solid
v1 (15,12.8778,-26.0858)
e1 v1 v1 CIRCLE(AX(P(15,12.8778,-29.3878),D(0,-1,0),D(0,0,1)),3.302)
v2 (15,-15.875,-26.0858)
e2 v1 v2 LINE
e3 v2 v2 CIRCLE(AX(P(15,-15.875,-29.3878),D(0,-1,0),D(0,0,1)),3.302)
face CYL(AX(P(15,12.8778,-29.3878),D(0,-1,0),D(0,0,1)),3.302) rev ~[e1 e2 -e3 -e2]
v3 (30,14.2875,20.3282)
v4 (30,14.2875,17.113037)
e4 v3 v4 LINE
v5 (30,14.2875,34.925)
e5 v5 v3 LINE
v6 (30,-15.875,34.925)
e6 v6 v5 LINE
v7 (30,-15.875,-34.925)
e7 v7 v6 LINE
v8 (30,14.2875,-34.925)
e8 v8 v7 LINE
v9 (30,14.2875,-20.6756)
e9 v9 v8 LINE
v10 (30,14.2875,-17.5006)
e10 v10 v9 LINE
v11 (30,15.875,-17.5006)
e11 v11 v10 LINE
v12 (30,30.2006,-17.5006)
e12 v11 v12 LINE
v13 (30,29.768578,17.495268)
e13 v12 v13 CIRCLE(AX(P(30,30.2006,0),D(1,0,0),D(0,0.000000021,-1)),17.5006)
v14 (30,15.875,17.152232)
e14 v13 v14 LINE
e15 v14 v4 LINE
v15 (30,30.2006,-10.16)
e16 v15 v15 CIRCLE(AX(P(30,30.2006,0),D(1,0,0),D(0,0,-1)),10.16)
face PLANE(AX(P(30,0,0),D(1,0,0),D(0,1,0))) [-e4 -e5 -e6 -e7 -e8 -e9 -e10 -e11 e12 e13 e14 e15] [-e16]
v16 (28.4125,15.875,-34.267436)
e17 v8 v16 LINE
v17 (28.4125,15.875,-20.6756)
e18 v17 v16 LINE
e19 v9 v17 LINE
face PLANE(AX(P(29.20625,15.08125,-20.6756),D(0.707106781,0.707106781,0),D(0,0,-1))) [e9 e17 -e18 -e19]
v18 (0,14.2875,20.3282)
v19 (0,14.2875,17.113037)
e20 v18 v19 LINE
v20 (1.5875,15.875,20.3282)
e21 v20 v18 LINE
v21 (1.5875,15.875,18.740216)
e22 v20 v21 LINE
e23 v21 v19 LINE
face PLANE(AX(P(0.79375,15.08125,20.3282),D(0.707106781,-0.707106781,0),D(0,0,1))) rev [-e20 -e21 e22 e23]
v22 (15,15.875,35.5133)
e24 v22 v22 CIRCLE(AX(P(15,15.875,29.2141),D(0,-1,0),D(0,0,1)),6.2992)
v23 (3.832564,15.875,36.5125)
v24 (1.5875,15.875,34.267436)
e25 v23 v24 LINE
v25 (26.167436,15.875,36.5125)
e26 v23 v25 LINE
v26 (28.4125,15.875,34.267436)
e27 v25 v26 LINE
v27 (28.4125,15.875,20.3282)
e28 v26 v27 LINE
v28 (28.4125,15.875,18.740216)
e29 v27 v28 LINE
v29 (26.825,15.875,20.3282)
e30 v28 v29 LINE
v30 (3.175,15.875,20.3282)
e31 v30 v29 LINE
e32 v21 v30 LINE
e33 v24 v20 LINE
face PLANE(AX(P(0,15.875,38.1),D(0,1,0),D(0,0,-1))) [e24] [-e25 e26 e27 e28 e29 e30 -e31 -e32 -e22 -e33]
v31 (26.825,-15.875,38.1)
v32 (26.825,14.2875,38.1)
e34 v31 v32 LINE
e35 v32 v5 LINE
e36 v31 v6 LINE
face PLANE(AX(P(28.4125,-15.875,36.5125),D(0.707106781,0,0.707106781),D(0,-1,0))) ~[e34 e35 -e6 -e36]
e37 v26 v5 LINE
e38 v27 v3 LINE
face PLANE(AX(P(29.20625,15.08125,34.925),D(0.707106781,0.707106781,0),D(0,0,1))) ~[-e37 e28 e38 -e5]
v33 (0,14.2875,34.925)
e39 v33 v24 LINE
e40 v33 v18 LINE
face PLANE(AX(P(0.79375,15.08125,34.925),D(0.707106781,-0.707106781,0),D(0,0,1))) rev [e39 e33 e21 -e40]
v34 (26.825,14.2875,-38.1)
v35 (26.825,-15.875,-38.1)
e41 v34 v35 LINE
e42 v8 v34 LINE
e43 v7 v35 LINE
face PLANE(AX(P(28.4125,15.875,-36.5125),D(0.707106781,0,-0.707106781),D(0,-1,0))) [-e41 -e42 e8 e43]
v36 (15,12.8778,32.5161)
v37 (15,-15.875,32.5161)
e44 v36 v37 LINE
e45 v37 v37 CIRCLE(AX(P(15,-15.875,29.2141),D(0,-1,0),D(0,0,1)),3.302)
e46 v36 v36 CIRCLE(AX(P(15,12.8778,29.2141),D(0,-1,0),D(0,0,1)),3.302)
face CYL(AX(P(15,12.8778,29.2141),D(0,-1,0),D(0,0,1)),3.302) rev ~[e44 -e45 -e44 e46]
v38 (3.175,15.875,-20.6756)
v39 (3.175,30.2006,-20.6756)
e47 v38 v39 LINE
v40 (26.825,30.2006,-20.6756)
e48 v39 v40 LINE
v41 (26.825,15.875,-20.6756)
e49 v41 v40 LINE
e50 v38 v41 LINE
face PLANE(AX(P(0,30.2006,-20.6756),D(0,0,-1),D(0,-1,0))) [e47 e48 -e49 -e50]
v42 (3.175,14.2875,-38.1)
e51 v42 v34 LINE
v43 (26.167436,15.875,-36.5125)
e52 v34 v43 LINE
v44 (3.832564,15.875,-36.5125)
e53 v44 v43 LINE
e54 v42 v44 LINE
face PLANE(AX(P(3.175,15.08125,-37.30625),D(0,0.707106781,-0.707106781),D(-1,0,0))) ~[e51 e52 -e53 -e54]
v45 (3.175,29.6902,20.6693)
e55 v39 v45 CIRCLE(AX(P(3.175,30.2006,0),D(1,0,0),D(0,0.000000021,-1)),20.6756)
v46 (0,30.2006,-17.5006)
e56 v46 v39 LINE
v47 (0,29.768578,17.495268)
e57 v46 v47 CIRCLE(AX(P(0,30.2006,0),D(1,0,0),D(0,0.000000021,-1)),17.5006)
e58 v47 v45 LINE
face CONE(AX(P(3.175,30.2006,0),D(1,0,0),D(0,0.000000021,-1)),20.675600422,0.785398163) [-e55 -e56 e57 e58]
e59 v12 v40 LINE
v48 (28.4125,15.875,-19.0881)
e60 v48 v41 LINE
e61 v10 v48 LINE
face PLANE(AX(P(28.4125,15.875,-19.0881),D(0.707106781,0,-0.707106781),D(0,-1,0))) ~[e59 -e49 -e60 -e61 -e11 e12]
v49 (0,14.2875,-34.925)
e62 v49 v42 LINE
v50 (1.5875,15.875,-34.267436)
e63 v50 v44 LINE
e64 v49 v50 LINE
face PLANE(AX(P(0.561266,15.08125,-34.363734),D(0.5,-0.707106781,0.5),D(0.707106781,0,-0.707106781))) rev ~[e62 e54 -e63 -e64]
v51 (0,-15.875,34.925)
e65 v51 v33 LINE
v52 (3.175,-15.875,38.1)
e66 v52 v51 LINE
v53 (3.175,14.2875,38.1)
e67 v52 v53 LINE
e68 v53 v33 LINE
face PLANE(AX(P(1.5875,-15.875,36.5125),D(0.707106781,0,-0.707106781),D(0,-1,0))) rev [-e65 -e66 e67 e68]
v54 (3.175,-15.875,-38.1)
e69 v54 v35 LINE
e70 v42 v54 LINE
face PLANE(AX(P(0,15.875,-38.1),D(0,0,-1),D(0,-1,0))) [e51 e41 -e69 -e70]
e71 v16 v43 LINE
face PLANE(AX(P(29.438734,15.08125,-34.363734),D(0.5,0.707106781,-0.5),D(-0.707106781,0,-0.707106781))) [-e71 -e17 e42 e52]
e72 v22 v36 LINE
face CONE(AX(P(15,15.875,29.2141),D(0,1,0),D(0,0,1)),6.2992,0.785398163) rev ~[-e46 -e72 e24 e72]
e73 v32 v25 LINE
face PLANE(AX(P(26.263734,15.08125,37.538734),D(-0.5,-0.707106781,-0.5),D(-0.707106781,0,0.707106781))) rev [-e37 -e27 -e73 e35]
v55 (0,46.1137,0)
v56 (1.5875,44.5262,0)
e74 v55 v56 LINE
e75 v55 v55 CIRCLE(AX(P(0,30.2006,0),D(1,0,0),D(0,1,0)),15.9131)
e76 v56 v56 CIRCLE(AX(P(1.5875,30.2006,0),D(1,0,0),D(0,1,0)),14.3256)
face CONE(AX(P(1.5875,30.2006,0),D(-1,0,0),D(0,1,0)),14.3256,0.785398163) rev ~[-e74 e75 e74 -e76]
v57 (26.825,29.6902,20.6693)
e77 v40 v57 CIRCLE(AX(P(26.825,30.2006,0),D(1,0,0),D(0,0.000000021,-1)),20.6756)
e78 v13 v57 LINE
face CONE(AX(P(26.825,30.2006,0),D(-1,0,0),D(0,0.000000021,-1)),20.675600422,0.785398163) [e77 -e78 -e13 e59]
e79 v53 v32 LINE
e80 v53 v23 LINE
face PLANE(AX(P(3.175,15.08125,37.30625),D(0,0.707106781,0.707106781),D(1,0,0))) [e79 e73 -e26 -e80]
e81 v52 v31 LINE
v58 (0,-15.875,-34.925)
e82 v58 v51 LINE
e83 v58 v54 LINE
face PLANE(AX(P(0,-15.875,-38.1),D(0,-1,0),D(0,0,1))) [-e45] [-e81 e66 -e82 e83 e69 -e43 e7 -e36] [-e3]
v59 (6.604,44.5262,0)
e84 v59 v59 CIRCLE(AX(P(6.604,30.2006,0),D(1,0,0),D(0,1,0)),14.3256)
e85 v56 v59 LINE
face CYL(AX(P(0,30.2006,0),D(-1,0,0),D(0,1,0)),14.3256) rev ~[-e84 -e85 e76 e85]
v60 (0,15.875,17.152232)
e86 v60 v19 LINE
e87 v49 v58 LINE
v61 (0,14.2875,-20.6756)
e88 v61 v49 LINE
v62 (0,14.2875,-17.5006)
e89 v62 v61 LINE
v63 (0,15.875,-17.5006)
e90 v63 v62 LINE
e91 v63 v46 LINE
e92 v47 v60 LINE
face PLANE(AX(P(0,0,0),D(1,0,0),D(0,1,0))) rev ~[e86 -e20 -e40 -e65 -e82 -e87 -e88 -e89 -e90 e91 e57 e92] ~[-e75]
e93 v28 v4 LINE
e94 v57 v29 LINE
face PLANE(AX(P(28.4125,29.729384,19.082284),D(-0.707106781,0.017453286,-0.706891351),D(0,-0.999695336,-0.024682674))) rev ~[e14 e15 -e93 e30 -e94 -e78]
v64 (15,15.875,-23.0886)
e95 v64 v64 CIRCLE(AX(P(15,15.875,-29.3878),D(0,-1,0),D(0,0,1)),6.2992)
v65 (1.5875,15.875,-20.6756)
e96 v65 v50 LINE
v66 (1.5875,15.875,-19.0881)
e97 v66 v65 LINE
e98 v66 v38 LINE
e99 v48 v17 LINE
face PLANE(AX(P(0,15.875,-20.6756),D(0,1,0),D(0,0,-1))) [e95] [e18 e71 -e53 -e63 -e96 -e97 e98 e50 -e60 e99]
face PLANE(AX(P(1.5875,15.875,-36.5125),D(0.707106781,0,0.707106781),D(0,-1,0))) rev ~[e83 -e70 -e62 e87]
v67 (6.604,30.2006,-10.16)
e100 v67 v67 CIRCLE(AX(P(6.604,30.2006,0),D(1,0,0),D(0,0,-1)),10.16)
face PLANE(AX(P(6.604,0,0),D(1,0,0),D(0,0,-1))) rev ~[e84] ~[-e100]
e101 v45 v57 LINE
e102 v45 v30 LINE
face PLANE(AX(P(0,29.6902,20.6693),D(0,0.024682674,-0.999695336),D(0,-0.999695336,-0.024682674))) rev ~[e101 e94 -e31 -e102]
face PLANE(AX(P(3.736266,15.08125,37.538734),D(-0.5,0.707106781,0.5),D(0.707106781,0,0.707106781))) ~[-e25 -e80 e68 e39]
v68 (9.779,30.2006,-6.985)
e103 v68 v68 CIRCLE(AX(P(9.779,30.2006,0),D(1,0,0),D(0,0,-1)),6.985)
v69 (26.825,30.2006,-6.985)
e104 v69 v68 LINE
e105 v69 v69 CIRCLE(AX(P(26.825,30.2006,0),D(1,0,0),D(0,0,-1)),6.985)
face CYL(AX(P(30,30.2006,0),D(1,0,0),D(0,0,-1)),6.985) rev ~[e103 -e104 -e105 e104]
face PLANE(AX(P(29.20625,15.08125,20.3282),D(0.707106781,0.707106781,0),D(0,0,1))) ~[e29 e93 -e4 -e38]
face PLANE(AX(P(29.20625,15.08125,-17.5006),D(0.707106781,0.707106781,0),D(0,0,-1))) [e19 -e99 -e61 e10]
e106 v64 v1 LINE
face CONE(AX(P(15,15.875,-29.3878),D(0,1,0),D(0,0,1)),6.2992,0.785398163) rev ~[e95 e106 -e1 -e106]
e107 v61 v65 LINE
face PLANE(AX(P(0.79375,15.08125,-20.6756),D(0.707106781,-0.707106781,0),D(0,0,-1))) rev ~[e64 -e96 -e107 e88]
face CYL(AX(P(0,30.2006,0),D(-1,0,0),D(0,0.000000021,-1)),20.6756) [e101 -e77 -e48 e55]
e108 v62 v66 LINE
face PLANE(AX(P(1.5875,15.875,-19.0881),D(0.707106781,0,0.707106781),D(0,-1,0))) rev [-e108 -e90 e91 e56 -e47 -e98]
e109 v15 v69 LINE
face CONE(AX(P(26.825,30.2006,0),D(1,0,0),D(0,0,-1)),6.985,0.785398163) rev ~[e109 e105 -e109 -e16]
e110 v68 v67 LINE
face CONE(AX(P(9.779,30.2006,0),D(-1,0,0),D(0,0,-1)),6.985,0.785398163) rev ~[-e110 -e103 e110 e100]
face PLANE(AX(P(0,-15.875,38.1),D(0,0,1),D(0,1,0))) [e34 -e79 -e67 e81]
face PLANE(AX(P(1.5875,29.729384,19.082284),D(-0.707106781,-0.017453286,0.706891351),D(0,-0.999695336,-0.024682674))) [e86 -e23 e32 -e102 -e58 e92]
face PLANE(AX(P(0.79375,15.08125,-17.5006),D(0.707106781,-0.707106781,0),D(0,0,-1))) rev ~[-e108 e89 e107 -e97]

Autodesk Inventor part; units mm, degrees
ref_plane "YZ Plane" through (0, 0, 0) normal (1, 0, 0) x (0, 1, 0)
ref_plane "XZ Plane" through (0, 0, 0) normal (0, 1, 0) x (-1, 0, 0)
ref_plane "XY Plane" through (0, 0, 0) normal (0, 0, 1) x (1, 0, 0)
sketch "Sketch1" plane through (0, 0, 0) normal (1, 0, 0) x (0, 1, 0)
  line L0 (-15.875, 38.1) -> (15.875, 38.1)
  line L1 (15.875, -38.1) -> (-15.875, -38.1)
  line L2 (-15.875, -38.1) -> (-15.875, 38.1)
  line L3 (-15.875, 38.1) -> (15.875, -38.1) construction
  line L4 (15.875, 38.1) -> (-15.875, -38.1) construction
  circle A0 centre (30.2006, 0) radius 14.3256
  line L5 (29.6902, 20.6693) -> (15.875, 20.3282)
  line L6 (30.2006, -20.6756) -> (15.875, -20.6756)
  arc A1 (30.2006, -20.6756) -> (29.6902, 20.6693) centre (30.2006, 0) ccw
  line L7 (15.875, 38.1) -> (15.875, 20.3282)
  line L8 (15.875, -20.6756) -> (15.875, -38.1)
  point P0 (0, 0)
  point P1 (0, 0)
  point P2 (0, 0)
  dimension "d0" = 31.75
  dimension "d2" = 28.6512
  dimension "d4" = 6.35
  dimension "d5" = 1.414
  dimension "d24" = 76.2
extrude "Extrusion1" add sketch "Sketch1" along normal blind 30
sketch "Sketch2" plane through (30, 0, 0) normal (1, 0, 0) x (0, 0, -1)
  circle A0 centre (0, 30.2006) radius 14.3256 projected
  arc A1 (20.6756, 30.2006) -> (-20.6693, 29.6902) centre (0, 30.2006) ccw projected
  circle A2 centre (0, 30.2006) radius 6.985
  circle A3 centre (0, 30.2006) radius 14.3256
  point P0 (0, 0)
  dimension "d8" = 13.97
extrude "Extrusion2" add sketch "Sketch2" against normal blind 23.396
sketch "Sketch3" plane through (0, 15.875, -20.6756) normal (0, 1, 0) x (1, 0, 0)
  line L0 (30, 0) -> (0, 17.4244)
  line L1 (30, -41.0038) -> (30, -58.7756) projected
  line L2 (0, -41.0038) -> (30, -41.0038) projected
  line L3 (30, -58.7756) -> (0, -41.0038)
  point P0 (0, -20.6756)
  point P1 (15, -49.8897)
  point P2 (15, 8.7122)
hole "Hole1" at (15, 15.875, 29.2141) at (15, 15.875, -29.3878) direction (0, -1, 0) diameter 6.604 end through all countersink diameter 12.5984 countersink angle 90 clearance for "Flat Head Machine Screw" size "M6" standard "Ansi Metric M Profile"
chamfer "Chamfer1" distance 3.175 angle 45 12 edges at (0, 0, 38.1) (30, 0, 38.1) (0, 0, -38.1) (30, 0, -38.1) (0, 50.8746, 0.2552) (0, 23.0378, -20.6756) (0, 22.7826, 20.4987) (30, 50.8746, 0.2552) (30, 22.7826, 20.4987) (30, 23.0378, -20.6756) (30, 30.2006, 6.985) (6.604, 30.2006, 6.985)
chamfer "Chamfer2" distance 1.5875 angle 45 11 edges at (0, 15.875, -27.8003) (15, 15.875, -38.1) (30, 15.875, -27.8003) (30, 15.875, 27.6266) (28.4125, 15.875, 36.5125) (15, 15.875, 38.1) (1.5875, 15.875, 36.5125) (0, 15.875, 27.6266) (1.5875, 15.875, -36.5125) (28.4125, 15.875, -36.5125) (0, 15.875, 0)
properties part number "2316_Pillow Block_V1"
